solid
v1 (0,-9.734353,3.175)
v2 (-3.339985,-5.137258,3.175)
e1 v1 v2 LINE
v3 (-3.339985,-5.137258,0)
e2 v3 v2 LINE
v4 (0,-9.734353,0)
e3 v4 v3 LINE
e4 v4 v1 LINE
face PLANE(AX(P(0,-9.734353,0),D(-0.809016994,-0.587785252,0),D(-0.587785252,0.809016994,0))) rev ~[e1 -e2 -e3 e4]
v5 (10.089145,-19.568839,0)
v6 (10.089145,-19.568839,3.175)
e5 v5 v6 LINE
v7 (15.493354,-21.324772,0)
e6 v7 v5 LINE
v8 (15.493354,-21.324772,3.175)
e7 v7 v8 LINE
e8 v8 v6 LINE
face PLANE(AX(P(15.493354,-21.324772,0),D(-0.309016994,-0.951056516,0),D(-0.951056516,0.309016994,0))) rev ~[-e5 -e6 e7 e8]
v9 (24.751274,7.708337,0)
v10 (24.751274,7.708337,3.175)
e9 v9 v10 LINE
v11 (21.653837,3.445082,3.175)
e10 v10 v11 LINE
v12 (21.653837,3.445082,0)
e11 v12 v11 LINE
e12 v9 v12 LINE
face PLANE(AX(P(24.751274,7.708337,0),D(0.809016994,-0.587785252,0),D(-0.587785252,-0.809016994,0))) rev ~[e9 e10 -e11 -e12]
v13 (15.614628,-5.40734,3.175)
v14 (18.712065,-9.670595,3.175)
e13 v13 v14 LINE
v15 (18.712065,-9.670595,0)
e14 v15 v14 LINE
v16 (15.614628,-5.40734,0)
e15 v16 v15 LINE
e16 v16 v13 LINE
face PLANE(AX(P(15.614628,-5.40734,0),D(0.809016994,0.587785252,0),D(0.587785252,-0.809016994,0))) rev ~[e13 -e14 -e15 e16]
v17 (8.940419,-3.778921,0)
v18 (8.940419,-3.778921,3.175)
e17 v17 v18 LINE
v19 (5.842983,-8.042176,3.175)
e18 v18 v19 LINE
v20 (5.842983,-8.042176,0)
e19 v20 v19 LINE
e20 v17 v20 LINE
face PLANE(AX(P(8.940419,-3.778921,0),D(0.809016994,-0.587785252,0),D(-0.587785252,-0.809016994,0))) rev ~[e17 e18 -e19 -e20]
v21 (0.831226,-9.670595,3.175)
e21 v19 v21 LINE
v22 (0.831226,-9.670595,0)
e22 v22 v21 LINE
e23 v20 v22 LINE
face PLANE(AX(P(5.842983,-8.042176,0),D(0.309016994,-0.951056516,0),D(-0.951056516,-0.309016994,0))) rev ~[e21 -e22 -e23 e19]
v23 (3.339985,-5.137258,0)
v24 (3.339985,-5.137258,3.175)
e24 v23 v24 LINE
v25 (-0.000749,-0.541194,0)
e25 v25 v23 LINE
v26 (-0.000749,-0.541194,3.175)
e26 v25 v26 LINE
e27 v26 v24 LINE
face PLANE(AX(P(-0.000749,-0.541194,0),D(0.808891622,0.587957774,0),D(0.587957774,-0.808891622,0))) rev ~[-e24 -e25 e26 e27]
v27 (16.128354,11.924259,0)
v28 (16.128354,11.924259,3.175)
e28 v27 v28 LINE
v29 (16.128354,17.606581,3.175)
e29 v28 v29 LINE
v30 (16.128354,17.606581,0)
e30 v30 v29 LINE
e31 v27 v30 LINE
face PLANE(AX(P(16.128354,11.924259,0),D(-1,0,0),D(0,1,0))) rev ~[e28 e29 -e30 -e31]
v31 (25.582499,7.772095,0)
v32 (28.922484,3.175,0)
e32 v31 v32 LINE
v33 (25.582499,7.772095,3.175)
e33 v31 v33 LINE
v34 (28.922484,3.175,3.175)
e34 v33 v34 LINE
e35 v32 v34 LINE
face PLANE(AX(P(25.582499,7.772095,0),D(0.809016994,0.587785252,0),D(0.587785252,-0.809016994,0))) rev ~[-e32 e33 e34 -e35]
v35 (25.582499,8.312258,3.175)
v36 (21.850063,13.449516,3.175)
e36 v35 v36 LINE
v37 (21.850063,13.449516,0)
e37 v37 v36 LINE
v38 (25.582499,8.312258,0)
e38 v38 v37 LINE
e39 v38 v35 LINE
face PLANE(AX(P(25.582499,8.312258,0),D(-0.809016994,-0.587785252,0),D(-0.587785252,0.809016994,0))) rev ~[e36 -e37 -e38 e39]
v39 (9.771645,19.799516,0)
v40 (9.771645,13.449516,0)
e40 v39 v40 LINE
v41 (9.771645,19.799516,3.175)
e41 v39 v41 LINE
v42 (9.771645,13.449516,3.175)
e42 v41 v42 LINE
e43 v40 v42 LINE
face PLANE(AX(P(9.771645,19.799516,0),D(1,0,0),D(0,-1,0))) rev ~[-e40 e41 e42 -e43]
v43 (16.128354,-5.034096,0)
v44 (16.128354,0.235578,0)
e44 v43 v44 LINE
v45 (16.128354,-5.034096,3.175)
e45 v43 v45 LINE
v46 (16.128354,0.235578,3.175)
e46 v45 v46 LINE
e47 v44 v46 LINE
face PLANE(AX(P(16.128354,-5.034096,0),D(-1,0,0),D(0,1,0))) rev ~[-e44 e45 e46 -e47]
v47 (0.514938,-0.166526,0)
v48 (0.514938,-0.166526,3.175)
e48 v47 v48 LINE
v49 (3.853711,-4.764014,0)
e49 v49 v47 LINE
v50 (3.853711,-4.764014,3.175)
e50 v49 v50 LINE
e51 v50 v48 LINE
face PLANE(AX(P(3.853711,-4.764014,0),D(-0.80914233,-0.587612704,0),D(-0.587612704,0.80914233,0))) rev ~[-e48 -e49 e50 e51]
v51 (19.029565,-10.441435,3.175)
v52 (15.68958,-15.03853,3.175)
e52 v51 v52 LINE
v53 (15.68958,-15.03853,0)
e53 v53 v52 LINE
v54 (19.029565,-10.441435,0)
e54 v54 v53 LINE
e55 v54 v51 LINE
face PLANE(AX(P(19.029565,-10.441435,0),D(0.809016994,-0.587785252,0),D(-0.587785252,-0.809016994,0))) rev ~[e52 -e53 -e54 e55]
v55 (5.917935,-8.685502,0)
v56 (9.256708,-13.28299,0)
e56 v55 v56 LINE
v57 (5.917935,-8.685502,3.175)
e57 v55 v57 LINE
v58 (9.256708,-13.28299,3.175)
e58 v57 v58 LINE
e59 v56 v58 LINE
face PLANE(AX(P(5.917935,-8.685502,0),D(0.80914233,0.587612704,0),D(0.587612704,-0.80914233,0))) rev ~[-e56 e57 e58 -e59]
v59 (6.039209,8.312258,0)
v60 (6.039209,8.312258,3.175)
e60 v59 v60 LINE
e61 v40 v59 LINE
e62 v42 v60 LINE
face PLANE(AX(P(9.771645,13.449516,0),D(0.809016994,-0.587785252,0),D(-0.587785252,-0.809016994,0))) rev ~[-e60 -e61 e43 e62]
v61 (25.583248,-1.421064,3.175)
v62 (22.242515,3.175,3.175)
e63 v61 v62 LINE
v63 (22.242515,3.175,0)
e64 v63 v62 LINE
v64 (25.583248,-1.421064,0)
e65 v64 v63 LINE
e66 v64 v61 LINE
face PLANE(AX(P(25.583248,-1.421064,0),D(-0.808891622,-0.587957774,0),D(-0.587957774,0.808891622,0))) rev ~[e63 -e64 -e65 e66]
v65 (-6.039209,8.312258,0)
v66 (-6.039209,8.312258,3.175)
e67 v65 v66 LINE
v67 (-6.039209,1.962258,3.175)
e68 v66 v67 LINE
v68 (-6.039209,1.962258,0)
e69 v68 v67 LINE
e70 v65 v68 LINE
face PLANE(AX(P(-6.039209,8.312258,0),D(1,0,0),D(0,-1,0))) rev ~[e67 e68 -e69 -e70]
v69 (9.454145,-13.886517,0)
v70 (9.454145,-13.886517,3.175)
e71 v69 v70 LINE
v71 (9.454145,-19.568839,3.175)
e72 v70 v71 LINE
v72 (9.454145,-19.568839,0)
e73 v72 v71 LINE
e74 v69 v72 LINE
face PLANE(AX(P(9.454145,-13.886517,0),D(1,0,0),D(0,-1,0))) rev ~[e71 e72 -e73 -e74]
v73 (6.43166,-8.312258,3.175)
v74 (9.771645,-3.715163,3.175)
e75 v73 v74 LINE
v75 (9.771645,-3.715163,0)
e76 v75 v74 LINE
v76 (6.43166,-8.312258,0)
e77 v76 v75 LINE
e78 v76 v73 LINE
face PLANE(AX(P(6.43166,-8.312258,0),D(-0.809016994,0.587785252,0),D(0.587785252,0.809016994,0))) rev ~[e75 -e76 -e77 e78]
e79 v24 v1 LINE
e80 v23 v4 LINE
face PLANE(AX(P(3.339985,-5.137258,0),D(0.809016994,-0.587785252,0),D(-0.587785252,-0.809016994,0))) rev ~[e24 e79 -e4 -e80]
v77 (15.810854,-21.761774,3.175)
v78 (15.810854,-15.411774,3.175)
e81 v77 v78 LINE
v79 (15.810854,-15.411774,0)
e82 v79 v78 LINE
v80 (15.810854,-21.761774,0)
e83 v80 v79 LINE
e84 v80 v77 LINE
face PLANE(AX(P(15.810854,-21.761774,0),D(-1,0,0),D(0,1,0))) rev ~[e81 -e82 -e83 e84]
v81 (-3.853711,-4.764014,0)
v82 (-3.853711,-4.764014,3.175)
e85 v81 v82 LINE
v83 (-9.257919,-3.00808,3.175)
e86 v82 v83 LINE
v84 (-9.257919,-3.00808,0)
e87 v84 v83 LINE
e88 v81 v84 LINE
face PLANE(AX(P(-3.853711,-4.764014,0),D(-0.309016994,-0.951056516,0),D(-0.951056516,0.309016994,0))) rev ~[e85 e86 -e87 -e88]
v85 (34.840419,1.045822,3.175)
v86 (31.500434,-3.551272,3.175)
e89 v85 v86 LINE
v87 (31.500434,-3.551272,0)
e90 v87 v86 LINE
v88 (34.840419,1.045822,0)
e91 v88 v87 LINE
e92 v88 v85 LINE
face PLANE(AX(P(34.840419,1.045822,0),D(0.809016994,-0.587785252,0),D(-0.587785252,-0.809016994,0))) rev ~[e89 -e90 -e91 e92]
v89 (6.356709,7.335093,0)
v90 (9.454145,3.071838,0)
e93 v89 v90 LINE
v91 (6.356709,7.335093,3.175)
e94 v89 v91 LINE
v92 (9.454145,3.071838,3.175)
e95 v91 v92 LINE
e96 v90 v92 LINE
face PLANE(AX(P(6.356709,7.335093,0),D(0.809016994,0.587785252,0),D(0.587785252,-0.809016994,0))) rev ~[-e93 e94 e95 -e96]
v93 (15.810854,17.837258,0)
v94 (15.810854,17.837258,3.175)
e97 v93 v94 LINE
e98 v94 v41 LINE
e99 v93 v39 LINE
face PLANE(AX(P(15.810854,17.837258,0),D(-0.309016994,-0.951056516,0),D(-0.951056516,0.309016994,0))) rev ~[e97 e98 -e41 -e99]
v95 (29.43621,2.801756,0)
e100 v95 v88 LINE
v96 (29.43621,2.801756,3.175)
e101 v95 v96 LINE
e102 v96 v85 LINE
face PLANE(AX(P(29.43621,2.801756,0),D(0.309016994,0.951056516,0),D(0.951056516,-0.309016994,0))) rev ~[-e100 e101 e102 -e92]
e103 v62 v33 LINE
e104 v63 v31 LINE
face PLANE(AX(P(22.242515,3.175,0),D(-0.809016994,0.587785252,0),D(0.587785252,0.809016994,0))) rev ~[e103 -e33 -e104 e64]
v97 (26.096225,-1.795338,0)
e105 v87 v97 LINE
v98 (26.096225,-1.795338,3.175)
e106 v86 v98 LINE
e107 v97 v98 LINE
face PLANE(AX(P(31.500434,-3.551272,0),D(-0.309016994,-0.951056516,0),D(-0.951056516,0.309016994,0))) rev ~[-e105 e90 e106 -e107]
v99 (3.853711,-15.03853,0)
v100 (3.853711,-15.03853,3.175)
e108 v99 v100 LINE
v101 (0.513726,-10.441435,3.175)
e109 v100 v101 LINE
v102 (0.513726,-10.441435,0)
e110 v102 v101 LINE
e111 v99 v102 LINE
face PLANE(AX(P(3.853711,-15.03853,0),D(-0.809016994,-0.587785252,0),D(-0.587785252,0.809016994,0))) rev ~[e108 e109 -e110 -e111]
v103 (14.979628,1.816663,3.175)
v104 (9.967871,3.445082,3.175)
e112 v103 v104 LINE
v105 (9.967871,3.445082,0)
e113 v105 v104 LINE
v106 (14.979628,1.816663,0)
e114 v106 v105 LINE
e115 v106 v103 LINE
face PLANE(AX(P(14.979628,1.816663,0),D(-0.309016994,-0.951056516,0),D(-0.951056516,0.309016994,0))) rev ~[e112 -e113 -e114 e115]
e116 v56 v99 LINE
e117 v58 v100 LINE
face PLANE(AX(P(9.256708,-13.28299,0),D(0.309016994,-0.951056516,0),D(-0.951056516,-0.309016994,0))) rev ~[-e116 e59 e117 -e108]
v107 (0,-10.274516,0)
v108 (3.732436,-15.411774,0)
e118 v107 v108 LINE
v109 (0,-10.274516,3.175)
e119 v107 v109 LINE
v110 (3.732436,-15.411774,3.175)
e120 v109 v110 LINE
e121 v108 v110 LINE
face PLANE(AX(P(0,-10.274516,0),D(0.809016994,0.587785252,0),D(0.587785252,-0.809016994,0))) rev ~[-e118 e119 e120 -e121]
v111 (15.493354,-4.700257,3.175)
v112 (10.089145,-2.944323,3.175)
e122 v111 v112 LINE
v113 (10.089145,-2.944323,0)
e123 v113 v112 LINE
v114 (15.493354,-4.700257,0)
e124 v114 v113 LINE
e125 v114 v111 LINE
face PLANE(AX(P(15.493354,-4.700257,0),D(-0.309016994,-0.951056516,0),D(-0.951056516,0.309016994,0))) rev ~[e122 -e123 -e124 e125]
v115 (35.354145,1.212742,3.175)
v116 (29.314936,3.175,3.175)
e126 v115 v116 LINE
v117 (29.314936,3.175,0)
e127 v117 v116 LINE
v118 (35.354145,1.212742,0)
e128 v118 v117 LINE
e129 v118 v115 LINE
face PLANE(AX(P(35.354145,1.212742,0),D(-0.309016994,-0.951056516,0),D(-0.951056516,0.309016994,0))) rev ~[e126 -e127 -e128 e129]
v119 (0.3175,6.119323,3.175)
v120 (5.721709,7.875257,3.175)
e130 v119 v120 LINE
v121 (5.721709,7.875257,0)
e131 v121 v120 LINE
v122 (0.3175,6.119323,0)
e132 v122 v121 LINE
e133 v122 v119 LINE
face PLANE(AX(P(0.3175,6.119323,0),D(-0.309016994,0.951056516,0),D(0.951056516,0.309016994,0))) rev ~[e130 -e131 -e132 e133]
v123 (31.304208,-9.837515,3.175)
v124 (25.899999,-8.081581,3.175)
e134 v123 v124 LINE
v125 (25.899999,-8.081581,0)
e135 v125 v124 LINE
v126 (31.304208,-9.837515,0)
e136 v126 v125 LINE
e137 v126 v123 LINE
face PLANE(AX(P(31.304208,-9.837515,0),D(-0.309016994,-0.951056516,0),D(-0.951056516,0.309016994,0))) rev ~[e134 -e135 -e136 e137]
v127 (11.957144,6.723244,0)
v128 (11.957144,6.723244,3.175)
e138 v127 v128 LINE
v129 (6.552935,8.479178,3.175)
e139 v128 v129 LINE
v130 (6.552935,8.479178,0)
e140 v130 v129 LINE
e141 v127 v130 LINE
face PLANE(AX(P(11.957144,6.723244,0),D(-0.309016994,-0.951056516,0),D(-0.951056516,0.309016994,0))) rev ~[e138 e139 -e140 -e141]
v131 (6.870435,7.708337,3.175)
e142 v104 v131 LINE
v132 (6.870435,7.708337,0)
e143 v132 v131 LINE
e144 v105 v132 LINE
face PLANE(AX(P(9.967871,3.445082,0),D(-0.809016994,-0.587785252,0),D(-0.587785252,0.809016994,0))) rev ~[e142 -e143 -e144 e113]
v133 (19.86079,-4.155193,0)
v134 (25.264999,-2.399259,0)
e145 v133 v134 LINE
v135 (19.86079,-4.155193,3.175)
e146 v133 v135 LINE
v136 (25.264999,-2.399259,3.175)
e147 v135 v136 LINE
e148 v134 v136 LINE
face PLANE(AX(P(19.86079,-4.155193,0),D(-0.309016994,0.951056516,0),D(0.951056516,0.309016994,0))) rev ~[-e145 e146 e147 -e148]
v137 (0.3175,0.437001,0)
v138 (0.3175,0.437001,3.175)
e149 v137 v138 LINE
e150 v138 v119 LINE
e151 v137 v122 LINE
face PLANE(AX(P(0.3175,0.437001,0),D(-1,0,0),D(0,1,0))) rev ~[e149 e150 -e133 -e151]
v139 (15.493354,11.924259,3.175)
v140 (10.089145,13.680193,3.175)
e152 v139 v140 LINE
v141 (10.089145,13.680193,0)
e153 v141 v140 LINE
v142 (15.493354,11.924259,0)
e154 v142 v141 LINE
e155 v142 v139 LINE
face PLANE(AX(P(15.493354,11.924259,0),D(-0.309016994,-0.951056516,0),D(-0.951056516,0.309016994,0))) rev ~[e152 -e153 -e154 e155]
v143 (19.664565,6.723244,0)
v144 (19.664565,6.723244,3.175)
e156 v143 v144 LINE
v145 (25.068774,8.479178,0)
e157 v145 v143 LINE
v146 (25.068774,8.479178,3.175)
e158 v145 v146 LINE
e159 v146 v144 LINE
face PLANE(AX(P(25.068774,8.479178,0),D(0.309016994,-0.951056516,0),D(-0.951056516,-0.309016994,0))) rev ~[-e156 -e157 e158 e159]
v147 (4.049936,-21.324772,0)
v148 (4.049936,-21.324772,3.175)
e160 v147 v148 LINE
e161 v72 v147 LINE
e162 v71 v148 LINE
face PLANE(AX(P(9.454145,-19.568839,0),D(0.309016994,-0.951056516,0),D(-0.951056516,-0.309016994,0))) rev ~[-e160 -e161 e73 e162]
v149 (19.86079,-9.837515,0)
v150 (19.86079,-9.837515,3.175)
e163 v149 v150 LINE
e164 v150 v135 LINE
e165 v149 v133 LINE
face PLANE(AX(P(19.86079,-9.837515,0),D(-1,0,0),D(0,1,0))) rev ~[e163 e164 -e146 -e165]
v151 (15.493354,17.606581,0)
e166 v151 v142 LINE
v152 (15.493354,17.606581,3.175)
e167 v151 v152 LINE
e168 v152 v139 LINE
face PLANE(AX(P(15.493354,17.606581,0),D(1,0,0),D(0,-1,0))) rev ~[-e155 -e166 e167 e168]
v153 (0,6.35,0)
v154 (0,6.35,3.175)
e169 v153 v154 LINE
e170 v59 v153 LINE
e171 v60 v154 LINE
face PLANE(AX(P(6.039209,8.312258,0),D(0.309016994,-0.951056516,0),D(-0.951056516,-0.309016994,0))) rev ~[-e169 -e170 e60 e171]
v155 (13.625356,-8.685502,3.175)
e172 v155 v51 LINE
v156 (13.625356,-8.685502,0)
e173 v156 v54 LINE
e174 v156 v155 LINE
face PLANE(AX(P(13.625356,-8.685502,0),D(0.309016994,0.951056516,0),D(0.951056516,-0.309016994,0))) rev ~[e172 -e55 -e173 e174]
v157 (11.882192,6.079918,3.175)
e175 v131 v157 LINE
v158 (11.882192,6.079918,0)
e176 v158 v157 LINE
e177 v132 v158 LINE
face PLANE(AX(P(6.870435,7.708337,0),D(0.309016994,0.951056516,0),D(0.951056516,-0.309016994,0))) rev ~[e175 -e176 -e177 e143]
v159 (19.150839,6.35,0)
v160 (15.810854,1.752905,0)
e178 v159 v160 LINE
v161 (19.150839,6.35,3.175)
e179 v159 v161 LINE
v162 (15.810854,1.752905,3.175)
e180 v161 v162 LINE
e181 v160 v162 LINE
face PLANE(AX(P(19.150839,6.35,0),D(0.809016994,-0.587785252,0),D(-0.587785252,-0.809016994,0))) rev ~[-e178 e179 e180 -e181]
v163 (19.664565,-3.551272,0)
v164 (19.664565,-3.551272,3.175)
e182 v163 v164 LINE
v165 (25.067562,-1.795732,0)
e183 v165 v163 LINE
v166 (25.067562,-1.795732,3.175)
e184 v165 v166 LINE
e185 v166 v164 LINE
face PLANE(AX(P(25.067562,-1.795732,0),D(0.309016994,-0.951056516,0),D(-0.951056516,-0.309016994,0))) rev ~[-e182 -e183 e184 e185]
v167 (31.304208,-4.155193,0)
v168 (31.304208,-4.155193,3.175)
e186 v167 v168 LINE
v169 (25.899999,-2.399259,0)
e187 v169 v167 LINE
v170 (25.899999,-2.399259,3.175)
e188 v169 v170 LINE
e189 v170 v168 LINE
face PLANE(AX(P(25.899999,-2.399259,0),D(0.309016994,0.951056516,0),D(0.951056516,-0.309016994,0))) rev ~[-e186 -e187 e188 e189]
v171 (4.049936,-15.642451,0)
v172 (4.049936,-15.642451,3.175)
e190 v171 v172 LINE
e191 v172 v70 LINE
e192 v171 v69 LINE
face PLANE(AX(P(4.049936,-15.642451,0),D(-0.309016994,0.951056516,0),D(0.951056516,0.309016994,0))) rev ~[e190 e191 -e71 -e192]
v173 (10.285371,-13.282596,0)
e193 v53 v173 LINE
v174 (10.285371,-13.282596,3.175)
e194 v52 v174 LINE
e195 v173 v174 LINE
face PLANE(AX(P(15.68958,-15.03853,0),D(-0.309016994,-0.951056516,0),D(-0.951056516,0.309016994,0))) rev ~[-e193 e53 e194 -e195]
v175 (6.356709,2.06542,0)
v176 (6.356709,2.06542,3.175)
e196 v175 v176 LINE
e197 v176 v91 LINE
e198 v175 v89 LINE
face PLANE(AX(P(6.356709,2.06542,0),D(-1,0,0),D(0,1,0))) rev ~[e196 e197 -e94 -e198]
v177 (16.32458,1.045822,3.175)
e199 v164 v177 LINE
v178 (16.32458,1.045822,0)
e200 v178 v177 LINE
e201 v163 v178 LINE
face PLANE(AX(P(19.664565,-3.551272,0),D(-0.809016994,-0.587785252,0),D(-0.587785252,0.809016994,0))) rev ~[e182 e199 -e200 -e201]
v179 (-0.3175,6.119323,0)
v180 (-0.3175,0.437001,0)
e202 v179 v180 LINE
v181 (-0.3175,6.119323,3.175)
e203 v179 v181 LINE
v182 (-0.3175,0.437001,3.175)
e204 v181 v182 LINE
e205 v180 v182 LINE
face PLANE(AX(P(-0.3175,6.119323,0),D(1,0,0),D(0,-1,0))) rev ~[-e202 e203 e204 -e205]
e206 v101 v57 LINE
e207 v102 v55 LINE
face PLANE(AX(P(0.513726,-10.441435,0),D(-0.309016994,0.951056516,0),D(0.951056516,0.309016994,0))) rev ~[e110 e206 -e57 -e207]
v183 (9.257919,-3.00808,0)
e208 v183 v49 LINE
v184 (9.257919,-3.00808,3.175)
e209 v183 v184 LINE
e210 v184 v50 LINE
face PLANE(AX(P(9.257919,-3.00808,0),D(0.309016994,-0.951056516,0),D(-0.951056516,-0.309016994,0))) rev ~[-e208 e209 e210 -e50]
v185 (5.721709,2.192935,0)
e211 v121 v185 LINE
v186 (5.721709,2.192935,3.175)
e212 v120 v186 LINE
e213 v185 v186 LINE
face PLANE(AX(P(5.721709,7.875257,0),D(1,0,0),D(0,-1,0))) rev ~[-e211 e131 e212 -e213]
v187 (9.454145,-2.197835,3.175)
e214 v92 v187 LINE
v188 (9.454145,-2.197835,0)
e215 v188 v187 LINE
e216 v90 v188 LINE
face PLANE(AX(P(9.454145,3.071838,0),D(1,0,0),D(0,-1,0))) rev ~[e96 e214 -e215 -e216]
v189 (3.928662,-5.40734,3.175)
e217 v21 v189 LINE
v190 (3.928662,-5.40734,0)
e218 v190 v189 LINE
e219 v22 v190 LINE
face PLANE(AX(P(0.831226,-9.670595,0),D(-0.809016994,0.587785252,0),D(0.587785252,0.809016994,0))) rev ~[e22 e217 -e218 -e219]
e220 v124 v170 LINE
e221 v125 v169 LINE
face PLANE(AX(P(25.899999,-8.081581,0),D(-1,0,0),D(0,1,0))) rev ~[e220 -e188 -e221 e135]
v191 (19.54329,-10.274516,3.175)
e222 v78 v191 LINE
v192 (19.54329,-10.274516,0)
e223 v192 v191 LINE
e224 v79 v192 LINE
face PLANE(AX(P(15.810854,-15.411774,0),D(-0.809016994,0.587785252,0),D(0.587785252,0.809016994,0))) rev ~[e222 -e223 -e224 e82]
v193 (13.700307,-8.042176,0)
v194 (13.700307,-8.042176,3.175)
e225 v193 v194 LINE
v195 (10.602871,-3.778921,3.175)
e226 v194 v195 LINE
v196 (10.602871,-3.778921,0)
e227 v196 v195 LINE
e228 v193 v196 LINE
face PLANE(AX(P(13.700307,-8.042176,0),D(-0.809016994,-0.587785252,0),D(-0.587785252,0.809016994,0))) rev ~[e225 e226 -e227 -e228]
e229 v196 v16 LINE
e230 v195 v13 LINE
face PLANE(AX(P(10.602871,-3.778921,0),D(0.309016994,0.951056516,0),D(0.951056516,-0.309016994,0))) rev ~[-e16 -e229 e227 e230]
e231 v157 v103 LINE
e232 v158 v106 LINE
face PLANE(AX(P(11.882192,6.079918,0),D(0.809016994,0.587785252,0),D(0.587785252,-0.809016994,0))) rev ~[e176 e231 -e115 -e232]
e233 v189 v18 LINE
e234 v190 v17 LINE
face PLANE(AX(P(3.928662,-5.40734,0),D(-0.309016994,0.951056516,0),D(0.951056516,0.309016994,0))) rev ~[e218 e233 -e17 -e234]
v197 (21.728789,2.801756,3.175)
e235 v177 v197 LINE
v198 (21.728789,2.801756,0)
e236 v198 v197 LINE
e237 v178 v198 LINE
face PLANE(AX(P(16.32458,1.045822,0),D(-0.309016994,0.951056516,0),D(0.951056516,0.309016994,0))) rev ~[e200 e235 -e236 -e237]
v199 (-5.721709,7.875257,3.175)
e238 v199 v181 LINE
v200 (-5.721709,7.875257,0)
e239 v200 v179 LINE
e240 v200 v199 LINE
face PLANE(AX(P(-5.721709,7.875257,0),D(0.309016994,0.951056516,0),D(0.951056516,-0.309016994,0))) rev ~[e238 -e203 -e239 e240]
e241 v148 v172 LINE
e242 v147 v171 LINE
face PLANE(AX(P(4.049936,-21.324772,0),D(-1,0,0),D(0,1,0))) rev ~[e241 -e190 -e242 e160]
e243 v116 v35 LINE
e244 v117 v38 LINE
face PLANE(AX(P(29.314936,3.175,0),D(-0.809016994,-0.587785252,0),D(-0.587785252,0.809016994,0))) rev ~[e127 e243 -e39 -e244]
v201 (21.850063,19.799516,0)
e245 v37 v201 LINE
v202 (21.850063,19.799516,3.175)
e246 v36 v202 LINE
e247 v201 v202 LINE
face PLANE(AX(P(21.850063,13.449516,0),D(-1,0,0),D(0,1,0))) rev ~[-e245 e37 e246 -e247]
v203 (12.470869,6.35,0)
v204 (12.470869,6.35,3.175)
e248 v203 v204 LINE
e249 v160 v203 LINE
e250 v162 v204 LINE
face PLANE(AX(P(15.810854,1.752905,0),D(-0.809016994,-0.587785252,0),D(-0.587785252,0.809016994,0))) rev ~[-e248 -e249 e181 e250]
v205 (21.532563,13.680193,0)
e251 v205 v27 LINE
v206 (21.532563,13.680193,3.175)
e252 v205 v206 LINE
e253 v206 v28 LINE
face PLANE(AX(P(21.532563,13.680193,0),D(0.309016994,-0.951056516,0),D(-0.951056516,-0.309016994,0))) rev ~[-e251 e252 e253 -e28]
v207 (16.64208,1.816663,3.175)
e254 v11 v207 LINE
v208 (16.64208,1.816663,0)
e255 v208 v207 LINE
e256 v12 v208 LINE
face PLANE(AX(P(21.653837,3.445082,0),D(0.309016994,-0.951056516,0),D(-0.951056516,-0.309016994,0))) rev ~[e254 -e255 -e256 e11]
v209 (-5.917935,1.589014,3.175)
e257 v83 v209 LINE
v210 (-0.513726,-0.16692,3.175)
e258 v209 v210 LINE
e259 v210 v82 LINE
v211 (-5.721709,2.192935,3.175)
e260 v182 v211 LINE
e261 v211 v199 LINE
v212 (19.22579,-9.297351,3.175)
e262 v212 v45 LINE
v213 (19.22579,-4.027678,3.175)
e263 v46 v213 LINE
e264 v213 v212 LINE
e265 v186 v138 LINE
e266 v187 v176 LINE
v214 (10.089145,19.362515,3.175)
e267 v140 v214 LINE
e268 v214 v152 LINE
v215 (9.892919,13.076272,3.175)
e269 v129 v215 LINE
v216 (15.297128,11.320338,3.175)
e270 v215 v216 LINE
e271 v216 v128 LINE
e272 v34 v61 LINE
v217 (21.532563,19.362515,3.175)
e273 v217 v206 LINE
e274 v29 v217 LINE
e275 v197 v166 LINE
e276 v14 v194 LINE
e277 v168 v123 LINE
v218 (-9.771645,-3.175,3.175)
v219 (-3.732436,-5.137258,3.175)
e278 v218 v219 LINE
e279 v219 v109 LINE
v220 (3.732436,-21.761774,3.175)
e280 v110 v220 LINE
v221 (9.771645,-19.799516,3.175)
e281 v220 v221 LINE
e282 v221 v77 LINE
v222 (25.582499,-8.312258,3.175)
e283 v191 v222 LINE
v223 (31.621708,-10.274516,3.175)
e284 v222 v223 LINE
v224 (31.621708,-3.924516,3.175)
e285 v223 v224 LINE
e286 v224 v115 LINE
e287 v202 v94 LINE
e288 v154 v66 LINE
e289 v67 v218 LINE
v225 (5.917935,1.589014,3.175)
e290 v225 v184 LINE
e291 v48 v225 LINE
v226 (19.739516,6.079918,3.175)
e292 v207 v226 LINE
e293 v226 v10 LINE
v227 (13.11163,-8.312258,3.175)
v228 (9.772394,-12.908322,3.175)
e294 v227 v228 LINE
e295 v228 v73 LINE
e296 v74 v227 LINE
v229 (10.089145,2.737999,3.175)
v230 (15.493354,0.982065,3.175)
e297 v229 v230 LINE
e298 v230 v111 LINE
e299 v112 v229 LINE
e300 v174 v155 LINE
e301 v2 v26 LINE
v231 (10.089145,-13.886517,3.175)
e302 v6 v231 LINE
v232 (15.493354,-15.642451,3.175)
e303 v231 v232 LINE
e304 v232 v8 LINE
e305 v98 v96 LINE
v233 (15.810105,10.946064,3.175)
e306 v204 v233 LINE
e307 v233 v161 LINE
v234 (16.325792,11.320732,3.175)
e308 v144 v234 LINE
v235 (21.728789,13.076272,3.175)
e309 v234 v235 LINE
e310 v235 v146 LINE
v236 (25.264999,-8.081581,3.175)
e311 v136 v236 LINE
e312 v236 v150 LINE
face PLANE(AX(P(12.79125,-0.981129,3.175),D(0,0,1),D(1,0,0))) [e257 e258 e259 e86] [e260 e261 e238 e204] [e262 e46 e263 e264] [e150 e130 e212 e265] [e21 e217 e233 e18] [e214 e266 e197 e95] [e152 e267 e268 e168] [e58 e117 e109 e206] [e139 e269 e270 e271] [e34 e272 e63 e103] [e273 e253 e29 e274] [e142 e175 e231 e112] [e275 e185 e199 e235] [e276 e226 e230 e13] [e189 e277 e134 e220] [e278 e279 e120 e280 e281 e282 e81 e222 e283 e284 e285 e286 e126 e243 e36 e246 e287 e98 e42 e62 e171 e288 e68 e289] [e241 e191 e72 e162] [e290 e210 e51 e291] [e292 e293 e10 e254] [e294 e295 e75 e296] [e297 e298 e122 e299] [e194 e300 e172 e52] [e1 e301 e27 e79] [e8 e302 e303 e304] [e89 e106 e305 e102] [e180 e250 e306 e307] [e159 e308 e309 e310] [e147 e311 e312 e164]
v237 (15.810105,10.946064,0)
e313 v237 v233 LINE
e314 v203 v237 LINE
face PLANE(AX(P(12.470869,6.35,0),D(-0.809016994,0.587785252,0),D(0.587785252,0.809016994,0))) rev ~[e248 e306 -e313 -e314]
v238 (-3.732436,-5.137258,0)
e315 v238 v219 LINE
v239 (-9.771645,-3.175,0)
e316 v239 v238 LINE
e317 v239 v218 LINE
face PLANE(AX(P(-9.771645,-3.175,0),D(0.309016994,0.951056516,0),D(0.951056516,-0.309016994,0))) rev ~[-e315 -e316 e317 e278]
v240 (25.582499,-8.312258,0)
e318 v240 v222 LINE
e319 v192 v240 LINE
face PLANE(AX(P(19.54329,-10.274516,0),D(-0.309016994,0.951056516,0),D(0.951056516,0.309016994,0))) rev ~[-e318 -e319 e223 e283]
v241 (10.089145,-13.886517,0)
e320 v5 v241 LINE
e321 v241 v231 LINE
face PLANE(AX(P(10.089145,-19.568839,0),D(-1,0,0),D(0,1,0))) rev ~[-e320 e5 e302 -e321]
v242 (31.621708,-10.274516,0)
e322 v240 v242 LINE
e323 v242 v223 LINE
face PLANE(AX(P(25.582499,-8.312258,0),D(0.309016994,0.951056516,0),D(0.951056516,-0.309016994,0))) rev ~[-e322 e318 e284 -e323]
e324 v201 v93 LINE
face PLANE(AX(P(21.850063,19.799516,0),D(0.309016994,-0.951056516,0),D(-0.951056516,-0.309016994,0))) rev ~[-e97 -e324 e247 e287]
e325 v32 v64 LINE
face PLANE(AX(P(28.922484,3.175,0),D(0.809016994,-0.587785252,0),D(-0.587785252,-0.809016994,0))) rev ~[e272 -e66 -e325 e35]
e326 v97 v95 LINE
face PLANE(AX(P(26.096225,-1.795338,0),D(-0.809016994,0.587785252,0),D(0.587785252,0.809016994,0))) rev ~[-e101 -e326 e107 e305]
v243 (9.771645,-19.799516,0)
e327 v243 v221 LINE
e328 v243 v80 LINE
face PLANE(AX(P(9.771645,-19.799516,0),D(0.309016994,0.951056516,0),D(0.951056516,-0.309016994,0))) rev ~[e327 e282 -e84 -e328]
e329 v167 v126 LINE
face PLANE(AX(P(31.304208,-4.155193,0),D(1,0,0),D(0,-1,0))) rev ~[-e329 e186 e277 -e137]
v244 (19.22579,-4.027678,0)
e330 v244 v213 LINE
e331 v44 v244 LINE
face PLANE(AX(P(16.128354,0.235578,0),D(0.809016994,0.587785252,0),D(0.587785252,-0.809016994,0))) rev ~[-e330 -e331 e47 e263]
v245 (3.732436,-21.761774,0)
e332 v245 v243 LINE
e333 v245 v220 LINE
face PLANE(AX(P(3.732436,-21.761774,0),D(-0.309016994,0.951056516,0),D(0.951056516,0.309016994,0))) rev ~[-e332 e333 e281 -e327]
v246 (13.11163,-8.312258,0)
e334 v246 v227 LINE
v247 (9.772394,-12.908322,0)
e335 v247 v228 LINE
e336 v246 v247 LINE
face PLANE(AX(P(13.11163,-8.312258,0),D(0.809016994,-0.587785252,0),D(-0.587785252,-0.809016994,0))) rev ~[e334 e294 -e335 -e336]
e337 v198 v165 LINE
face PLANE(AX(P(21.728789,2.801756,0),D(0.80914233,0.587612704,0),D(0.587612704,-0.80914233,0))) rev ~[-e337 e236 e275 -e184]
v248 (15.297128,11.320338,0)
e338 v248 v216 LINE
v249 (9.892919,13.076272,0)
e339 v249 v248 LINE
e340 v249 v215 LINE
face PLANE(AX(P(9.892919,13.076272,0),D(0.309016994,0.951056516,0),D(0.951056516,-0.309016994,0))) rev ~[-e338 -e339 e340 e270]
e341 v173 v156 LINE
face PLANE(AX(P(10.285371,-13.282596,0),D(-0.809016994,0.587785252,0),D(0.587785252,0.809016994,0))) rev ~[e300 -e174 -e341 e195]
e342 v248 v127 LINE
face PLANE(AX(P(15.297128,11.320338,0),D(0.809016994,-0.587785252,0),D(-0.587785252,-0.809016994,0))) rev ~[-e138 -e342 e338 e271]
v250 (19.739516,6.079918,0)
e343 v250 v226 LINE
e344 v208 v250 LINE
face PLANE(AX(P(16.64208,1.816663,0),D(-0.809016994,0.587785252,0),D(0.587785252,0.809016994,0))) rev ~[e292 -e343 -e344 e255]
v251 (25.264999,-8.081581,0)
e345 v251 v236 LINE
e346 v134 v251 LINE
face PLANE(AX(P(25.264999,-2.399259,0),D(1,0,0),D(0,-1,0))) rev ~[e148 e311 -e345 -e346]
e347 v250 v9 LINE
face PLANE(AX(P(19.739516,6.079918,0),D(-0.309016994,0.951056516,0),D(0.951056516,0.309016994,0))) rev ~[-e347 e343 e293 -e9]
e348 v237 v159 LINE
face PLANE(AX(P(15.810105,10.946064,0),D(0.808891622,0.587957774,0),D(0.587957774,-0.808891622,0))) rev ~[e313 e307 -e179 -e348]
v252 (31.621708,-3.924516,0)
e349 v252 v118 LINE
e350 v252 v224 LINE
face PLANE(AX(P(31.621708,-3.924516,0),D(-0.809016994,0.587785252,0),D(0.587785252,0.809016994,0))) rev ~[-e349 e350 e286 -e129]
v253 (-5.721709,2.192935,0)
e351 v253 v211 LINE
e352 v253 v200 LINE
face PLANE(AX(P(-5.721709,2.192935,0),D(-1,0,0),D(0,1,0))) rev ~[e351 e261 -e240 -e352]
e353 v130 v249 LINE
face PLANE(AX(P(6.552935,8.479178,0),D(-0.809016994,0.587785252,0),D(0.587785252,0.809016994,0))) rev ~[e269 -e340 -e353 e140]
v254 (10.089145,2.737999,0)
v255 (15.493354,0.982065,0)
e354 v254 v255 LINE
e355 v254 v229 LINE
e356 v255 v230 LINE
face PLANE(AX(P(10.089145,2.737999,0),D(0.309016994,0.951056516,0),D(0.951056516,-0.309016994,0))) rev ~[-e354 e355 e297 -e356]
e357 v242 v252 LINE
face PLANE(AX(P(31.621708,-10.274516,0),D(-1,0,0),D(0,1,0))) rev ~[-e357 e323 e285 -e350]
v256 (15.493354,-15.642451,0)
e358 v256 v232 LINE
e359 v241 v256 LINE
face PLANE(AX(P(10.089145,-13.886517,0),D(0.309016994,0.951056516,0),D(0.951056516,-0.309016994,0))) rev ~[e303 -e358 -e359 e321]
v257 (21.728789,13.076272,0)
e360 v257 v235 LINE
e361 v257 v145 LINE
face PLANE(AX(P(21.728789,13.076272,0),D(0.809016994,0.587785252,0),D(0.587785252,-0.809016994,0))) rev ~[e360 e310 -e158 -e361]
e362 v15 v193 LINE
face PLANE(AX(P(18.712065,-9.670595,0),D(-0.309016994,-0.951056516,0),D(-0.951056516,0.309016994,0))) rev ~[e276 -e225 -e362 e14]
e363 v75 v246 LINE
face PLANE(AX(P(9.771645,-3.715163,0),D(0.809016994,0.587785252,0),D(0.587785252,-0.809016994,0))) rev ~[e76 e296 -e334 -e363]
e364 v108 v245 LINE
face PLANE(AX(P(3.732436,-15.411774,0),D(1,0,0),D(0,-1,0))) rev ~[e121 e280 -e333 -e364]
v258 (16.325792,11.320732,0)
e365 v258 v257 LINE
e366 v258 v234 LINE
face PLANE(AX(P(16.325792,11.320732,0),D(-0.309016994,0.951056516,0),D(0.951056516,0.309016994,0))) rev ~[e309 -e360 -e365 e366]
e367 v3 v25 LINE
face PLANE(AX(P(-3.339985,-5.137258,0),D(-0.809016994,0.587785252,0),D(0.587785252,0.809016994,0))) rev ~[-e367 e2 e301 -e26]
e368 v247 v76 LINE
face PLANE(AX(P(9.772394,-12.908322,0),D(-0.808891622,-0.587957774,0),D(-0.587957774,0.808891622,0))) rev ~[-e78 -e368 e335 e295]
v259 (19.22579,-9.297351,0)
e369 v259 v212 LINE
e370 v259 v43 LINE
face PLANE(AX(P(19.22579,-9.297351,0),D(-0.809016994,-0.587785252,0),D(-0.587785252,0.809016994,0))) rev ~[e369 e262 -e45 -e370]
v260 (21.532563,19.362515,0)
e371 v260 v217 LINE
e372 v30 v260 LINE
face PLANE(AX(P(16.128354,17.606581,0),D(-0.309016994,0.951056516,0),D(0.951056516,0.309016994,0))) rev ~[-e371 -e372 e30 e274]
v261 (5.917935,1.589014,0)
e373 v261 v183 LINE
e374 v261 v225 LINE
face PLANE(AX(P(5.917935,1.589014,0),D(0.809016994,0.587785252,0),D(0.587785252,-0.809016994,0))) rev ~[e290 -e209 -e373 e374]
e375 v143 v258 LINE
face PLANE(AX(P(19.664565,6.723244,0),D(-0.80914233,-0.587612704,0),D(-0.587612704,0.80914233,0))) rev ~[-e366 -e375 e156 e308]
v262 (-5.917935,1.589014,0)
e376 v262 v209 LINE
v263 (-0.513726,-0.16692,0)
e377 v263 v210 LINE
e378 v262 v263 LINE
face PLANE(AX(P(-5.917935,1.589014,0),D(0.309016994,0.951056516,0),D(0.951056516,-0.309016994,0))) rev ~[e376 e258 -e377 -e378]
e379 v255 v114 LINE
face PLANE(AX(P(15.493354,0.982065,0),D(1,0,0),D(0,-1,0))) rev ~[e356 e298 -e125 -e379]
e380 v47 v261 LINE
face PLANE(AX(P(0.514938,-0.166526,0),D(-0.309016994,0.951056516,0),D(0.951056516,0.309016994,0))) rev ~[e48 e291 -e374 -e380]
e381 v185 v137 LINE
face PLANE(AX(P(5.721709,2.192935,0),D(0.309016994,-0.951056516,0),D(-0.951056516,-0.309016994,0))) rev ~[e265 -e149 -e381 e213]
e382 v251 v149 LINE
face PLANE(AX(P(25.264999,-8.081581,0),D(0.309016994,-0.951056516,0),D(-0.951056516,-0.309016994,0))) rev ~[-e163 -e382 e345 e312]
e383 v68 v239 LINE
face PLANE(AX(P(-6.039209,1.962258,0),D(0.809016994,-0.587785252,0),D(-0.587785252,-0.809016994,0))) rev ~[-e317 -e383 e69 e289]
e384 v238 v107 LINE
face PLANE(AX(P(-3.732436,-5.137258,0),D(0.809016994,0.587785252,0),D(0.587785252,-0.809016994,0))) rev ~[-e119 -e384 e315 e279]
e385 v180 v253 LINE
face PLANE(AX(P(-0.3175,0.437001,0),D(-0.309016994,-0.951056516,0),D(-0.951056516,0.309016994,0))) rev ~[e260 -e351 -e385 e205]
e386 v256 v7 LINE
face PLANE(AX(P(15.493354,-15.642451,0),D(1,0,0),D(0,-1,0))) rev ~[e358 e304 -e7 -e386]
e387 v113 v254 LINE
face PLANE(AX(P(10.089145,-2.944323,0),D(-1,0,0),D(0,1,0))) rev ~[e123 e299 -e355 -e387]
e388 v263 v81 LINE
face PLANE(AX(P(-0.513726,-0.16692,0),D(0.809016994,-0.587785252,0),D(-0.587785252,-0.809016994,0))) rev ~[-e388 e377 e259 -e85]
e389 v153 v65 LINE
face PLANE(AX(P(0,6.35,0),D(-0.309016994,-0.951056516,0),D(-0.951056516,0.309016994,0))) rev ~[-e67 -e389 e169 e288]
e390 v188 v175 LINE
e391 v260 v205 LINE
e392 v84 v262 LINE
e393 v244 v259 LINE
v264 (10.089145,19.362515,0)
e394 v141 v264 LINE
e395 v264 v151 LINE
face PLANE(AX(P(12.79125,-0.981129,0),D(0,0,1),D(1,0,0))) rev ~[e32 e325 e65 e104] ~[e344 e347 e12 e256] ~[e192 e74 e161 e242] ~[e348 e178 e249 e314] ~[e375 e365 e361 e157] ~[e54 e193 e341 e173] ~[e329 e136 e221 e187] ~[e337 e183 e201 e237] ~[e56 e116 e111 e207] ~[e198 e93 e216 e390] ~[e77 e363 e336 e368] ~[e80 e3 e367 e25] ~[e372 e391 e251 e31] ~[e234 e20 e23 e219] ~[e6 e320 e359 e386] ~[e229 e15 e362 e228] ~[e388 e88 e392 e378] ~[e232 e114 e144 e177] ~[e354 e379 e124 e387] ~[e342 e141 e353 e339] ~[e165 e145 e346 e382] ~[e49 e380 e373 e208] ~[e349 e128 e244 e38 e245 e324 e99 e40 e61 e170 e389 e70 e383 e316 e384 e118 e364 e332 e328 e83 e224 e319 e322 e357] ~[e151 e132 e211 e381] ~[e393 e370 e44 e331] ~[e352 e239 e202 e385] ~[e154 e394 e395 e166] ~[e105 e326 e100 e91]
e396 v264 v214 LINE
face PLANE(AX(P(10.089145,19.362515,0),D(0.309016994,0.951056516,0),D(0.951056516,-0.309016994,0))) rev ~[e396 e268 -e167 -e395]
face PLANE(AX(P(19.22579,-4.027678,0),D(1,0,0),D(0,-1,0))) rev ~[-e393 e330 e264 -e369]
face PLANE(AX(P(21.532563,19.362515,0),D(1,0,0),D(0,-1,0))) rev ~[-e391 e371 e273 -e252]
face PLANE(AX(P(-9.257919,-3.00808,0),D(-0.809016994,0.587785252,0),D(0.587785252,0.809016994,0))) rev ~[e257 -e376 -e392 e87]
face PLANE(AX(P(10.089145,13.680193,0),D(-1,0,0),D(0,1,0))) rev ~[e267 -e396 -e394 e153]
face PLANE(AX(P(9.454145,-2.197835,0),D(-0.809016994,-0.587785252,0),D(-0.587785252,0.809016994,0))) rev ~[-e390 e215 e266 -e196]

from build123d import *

# Parameters (mm, degrees)
F1_DEPTH = 3.175


# Not quite as in the source:
# - a feature names something its author has since deleted; it is built from what else it names


with BuildPart() as f1:
    # F0 (on Top) → F1 (new body)
    with BuildSketch(Plane.XY):
        Polygon((6.0392088785, 8.3122579143), (0, 6.35), (-6.0392088785, 8.3122579143), (-6.0392088785, 1.9622579143), (-9.7716452305, -3.175), (-3.7324363521, -5.1372579143), (0, -10.2745158286), (3.7324363521, -15.4117737428), (3.7324363521, -21.7617737428), (9.7716452305, -19.7995158286), (15.810854109, -21.7617737428), (15.810854109, -15.4117737428), (19.5432904611, -10.2745158286), (25.5824993395, -8.3122579143), (31.621708218, -10.2745158286), (31.621708218, -3.9245158286), (35.3541445701, 1.2127420857), (29.3149356916, 3.175), (25.5824993395, 8.3122579143), (21.8500629875, 13.4495158286), (21.8500629875, 19.7995158286), (15.810854109, 17.8372579143), (9.7716452305, 19.7995158286), (9.7716452305, 13.4495158286), align=None)
        Polygon((9.4541452305, -19.5688385759), (4.0499363521, -21.3247724831), (4.0499363521, -15.6424509955), (9.4541452305, -13.8865170883), align=None, mode=Mode.SUBTRACT)
        Polygon((0.5137257914, -10.4414354567), (5.9179346699, -8.6855015495), (9.2567076833, -13.2829899238), (3.8537105606, -15.0385301076), align=None, mode=Mode.SUBTRACT)
        Polygon((-9.2579194391, -3.0080803719), (-5.9179346699, 1.5890142791), (-0.5137257914, -0.1669196281), (-3.8537105606, -4.7640142791), align=None, mode=Mode.SUBTRACT)
        Polygon((-0.0007489063, -0.5411940443), (3.3399847692, -5.1372579143), (0, -9.7343525653), (-3.3399847692, -5.1372579143), align=None, mode=Mode.SUBTRACT)
        Polygon((3.9286621435, -5.4073395459), (8.9404194391, -3.7789208878), (5.842983087, -8.0421762826), (0.8312257914, -9.6705949407), align=None, mode=Mode.SUBTRACT)
        Polygon((9.7716452305, -3.7151632633), (13.1116299997, -8.3122579143), (9.7723941368, -12.9083217842), (6.4316604613, -8.3122579143), align=None, mode=Mode.SUBTRACT)
        Polygon((9.2579194391, -3.0080803719), (3.8537105606, -4.7640142791), (0.5149375472, -0.1665259048), (5.9179346699, 1.5890142791), align=None, mode=Mode.SUBTRACT)
        Polygon((10.0891452305, -2.9443227474), (10.0891452305, 2.7379987403), (15.493354109, 0.9820648331), (15.493354109, -4.7002566545), align=None, mode=Mode.SUBTRACT)
        Polygon((15.493354109, -15.6424509955), (15.493354109, -21.3247724831), (10.0891452305, -19.5688385759), (10.0891452305, -13.8865170883), align=None, mode=Mode.SUBTRACT)
        Polygon((13.6253557912, -8.6855015495), (19.0295646696, -10.4414354567), (15.6895799004, -15.0385301076), (10.285371022, -13.2825962005), align=None, mode=Mode.SUBTRACT)
        Polygon((15.6146283176, -5.4073395459), (18.7120646696, -9.6705949407), (13.700307374, -8.0421762826), (10.602871022, -3.7789208878), align=None, mode=Mode.SUBTRACT)
        Polygon((19.2257904611, -9.2973513055), (16.128354109, -5.0340959107), (16.128354109, 0.2355775627), (19.2257904611, -4.0276778321), align=None, mode=Mode.SUBTRACT)
        Polygon((19.8607904611, -9.8375145688), (19.8607904611, -4.1551930812), (25.2649993395, -2.399259174), (25.2649993395, -8.0815806616), align=None, mode=Mode.SUBTRACT)
        Polygon((31.304208218, -9.8375145688), (25.8999993395, -8.0815806616), (25.8999993395, -2.399259174), (31.304208218, -4.1551930812), align=None, mode=Mode.SUBTRACT)
        Polygon((-5.7217088785, 7.8752566545), (-0.3175, 6.1193227474), (-0.3175, 0.4370012597), (-5.7217088785, 2.1929351669), align=None, mode=Mode.SUBTRACT)
        Polygon((5.7217088785, 7.8752566545), (5.7217088785, 2.1929351669), (0.3175, 0.4370012597), (0.3175, 6.1193227474), align=None, mode=Mode.SUBTRACT)
        Polygon((6.3567088785, 2.0654199178), (6.3567088785, 7.3350933912), (9.4541452305, 3.0718379964), (9.4541452305, -2.1978354769), align=None, mode=Mode.SUBTRACT)
        Polygon((9.967871022, 3.4450816317), (6.8704346699, 7.7083370264), (11.8821919655, 6.0799183683), (14.9796283176, 1.8166629736), align=None, mode=Mode.SUBTRACT)
        Polygon((6.5529346699, 8.4791775424), (9.8929194391, 13.0762721934), (15.2971283176, 11.3203382862), (11.9571435484, 6.7232436352), align=None, mode=Mode.SUBTRACT)
        Polygon((25.0675617923, -1.7957320095), (19.6645646696, -3.5512721934), (16.3245799004, 1.0458224576), (21.7287887789, 2.8017563648), align=None, mode=Mode.SUBTRACT)
        Polygon((15.810854109, 1.752905349), (12.4708693398, 6.35), (15.8101052028, 10.94606387), (19.1508388782, 6.35), align=None, mode=Mode.SUBTRACT)
        Polygon((21.6538371961, 3.4450816317), (16.6420799004, 1.8166629736), (19.7395162525, 6.0799183683), (24.7512735481, 7.7083370264), align=None, mode=Mode.SUBTRACT)
        Polygon((25.5832482458, -1.42106387), (22.2425145703, 3.175), (25.5824993395, 7.772094651), (28.9224841087, 3.175), align=None, mode=Mode.SUBTRACT)
        Polygon((29.4362099002, 2.8017563648), (34.8404187786, 1.0458224576), (31.5004340094, -3.5512721934), (26.096225131, -1.7953382862), align=None, mode=Mode.SUBTRACT)
        Polygon((21.7287887789, 13.0762721934), (25.0687735481, 8.4791775424), (19.6645646696, 6.7232436352), (16.3257916562, 11.3207320095), align=None, mode=Mode.SUBTRACT)
        Polygon((10.0891452305, 13.6801930812), (10.0891452305, 19.3625145688), (15.493354109, 17.6065806616), (15.493354109, 11.924259174), align=None, mode=Mode.SUBTRACT)
        Polygon((16.128354109, 17.6065806616), (21.5325629875, 19.3625145688), (21.5325629875, 13.6801930812), (16.128354109, 11.924259174), align=None, mode=Mode.SUBTRACT)
    extrude(amount=F1_DEPTH)


solid = f1.part
